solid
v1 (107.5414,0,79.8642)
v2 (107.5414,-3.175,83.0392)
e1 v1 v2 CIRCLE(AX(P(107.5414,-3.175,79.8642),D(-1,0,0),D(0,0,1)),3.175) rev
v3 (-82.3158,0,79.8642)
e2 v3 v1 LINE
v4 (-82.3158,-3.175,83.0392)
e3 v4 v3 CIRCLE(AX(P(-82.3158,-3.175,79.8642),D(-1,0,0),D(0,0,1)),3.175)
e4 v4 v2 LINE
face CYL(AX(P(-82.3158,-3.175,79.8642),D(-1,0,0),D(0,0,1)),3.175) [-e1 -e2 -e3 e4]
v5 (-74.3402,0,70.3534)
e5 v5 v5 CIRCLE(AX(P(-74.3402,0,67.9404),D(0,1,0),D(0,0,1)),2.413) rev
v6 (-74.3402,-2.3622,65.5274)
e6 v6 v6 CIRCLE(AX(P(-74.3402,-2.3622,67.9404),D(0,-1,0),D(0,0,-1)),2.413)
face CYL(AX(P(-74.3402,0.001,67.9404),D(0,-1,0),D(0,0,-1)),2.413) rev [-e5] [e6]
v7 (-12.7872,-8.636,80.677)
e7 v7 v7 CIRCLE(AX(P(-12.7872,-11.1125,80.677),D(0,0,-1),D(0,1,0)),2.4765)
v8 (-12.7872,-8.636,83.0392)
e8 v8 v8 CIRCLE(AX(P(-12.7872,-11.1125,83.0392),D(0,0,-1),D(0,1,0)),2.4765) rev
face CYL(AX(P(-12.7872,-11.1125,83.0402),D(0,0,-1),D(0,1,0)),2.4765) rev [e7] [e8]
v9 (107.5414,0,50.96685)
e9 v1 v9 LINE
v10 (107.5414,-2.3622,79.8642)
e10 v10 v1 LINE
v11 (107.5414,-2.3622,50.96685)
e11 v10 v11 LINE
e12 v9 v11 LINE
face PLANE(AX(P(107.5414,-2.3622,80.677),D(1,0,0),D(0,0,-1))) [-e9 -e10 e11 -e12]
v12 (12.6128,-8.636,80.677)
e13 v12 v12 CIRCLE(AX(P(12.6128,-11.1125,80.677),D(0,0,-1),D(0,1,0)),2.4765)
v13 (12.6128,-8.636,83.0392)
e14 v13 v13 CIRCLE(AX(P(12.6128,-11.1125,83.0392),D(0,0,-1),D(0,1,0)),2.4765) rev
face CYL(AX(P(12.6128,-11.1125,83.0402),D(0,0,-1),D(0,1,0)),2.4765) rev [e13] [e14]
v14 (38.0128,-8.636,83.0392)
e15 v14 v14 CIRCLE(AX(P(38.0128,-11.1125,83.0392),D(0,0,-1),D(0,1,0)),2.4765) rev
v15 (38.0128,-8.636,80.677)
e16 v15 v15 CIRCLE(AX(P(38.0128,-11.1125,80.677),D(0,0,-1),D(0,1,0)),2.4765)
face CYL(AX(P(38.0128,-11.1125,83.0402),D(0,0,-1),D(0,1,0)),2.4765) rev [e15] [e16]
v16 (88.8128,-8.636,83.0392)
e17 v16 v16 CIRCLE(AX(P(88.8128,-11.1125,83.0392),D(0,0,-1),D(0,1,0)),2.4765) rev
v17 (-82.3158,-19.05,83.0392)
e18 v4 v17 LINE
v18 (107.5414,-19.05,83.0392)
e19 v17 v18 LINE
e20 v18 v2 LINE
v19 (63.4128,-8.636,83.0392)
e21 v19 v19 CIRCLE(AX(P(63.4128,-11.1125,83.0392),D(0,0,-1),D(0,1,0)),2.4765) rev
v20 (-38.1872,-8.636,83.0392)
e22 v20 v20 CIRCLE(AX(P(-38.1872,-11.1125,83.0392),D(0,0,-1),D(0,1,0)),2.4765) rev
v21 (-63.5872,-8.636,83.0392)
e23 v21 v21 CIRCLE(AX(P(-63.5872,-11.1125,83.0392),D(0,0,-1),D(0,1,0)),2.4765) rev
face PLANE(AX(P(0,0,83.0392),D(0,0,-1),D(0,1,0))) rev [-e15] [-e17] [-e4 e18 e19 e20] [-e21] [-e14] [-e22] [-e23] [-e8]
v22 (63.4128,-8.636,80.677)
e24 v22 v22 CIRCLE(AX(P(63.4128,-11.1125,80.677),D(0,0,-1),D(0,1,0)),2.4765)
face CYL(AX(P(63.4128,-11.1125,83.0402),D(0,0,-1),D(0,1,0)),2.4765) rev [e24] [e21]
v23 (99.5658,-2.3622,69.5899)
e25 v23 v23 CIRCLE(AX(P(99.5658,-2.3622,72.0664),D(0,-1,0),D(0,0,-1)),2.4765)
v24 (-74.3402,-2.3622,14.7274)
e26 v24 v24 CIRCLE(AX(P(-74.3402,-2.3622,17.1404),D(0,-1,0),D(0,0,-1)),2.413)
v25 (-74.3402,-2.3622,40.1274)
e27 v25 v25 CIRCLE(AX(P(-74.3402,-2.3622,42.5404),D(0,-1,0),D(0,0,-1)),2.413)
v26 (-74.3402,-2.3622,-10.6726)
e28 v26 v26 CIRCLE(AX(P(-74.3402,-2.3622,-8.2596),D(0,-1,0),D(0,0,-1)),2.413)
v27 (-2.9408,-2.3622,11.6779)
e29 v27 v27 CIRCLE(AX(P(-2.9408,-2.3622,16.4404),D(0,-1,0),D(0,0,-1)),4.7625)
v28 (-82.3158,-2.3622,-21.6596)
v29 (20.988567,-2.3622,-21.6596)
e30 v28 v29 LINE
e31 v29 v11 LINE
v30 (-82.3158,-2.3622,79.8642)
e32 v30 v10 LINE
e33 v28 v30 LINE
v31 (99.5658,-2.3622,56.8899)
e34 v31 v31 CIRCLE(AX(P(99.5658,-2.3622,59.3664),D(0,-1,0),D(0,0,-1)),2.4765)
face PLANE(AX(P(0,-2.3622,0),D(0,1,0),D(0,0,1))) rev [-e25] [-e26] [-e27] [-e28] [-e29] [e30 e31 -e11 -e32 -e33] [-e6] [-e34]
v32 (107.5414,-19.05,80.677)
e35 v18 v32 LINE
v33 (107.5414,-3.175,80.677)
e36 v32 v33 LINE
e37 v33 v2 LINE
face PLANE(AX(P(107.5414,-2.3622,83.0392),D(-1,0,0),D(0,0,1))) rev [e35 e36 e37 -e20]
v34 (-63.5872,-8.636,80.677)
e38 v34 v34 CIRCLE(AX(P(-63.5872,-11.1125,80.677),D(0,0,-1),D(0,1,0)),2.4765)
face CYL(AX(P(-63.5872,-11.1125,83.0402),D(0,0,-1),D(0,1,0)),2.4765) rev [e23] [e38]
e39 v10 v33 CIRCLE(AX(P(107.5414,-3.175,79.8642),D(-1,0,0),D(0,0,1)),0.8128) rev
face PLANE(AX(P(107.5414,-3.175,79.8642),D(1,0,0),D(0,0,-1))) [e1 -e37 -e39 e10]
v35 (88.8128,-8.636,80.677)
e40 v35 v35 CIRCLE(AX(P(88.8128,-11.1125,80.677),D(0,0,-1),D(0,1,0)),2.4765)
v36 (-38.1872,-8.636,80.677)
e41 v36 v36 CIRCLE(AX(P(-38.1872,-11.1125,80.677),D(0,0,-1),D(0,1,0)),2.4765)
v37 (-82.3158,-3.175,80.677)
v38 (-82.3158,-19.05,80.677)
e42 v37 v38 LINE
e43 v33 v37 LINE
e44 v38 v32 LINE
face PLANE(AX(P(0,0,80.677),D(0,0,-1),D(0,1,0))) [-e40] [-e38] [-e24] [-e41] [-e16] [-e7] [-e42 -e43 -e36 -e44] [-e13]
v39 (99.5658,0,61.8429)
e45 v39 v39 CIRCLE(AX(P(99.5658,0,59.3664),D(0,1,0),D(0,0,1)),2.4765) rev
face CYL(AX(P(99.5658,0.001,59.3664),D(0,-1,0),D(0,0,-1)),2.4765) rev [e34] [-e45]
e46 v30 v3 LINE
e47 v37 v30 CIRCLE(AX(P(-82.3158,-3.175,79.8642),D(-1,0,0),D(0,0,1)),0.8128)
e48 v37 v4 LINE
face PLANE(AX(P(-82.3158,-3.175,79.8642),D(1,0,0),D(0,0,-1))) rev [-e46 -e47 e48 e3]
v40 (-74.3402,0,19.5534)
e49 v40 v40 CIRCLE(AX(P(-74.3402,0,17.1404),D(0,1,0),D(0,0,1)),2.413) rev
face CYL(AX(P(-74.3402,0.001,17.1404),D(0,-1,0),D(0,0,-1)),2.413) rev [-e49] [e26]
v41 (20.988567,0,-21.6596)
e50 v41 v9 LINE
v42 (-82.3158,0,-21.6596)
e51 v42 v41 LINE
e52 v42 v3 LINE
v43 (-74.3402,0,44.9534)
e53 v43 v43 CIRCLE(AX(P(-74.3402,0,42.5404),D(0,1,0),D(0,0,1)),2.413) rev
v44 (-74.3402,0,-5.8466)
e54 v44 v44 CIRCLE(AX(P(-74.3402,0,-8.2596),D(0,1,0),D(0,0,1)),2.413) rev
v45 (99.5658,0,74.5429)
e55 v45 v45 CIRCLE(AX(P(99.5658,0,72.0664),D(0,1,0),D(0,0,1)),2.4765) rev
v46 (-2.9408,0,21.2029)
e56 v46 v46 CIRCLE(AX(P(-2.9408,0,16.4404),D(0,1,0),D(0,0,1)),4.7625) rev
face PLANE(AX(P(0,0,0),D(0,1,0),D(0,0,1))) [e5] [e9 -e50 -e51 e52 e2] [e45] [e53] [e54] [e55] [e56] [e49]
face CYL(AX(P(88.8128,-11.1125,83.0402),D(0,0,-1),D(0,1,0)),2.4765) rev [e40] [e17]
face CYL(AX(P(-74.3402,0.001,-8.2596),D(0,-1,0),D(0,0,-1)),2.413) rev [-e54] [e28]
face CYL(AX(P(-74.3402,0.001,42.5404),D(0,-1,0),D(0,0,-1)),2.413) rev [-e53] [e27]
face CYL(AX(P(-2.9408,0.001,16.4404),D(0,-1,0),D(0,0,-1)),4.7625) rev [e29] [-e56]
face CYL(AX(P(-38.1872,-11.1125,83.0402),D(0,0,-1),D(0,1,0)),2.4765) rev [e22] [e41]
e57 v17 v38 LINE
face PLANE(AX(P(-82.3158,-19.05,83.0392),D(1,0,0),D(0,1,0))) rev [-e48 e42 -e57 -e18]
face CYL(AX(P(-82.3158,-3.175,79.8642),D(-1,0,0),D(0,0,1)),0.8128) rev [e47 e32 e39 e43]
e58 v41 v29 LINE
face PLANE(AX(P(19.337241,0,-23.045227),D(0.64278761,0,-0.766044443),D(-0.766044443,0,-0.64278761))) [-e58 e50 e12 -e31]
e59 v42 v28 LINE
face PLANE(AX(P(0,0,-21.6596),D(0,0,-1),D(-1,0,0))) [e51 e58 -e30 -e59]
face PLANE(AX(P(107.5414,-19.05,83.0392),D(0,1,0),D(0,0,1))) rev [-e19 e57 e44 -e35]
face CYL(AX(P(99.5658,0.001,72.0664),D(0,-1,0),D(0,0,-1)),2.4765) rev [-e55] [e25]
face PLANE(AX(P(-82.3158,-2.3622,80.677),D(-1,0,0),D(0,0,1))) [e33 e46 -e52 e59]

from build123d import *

# Parameters (mm, degrees)
SKETCH1_W                    = 189.8572
SKETCH1_H                    = 175.514
BASE_FLANGE1_DEPTH           = 2.3622
EDGE_FLANGE4_STRIP_W         = 11.0744
EDGE_FLANGE4_STRIP_H         = 2.3622
EDGE_FLANGE4_STRIP_CUT_DEPTH = 189.8572
EDGE_FLANGE4_DEPTH           = 189.8572
CUT_EXTRUDE1_DEPTH           = 145.352665205
CUT_EXTRUDE5_REACH           = 151.669
SKETCH41_R                   = 2.4765
CUT_EXTRUDE6_REACH           = 138.891
SKETCH42_R                   = 2.413
SKETCH42_R_2                 = 2.4765
CUT_EXTRUDE7_REACH           = 138.891
SKETCH43_R                   = 4.7625


# Sheet-metal steps are written as plain solids
with BuildPart() as part:
    # Sketch1 → Base-Flange1 (new body)
    with BuildSketch(Plane(origin=(0, 0, 0), x_dir=(1, 0, 0), z_dir=(0, 1, 0))):
        with Locations((12.6128, 7.08)):
            Rectangle(SKETCH1_W, SKETCH1_H)
    extrude(amount=-BASE_FLANGE1_DEPTH)

    # Edge-Flange4 strip (across the edge) → Edge-Flange4 strip cut (cut)
    with BuildSketch(Plane(origin=(107.5414, -2.3622, 80.677), x_dir=(0, 0, -1), z_dir=(-1, 0, 0))):
        with Locations((-4.7244, -1.1811)):
            Rectangle(EDGE_FLANGE4_STRIP_W, EDGE_FLANGE4_STRIP_H)
    extrude(amount=EDGE_FLANGE4_STRIP_CUT_DEPTH, mode=Mode.SUBTRACT)

    # Edge-Flange4 section (across the edge) → Edge-Flange4 (add)
    with BuildSketch(Plane(origin=(107.5414, -2.3622, 80.677), x_dir=(0, 0, -1), z_dir=(-1, 0, 0))):
        with BuildLine():
            Line((-2.3622, 0.8128), (-2.3622, 16.6878))
            Line((-2.3622, 16.6878), (0, 16.6878))
            Line((0, 16.6878), (0, 0.8128))
            ThreePointArc((0, 0.8128), (0.238063608, 0.238063608), (0.8128, 0))
            Line((0.8128, 0), (0.8128, -2.3622))
            ThreePointArc((0.8128, -2.3622), (-1.43226403, -1.43226403), (-2.3622, 0.8128))
        make_face()
    extrude(amount=EDGE_FLANGE4_DEPTH)

    # Sketch36 → Cut-Extrude1 (cut, through all)
    with BuildSketch(Plane.XZ.offset(2.3622)):
        Polygon((20.98856689, -21.6596), (-82.3158, -21.6596), (-82.3158, -94.837), (107.5414, -94.837), (107.5414, 50.96685034), align=None)
    extrude(amount=-CUT_EXTRUDE1_DEPTH, mode=Mode.SUBTRACT)

    # Sketch41 → Cut-Extrude5 (cut, up to next)
    with BuildSketch(Plane(origin=(0, 0, 80.677), x_dir=(-1, 0, 0), z_dir=(0, 0, -1)), mode=Mode.PRIVATE) as cut_extrude5_sk1:
        with Locations(Location((-88.8128, -11.1125, 0), (0, 0, 90))):
            Circle(SKETCH41_R)
    cut_extrude5_tool1 = extrude(cut_extrude5_sk1.sketch, amount=-CUT_EXTRUDE5_REACH, mode=Mode.PRIVATE) & part.part
    # Sketch41 → Cut-Extrude5 (cut, up to next)
    with BuildSketch(Plane(origin=(0, 0, 80.677), x_dir=(-1, 0, 0), z_dir=(0, 0, -1)), mode=Mode.PRIVATE) as cut_extrude5_sk2:
        with Locations(Location((-63.4128, -11.1125, 0), (0, 0, 90))):
            Circle(SKETCH41_R)
    cut_extrude5_tool2 = extrude(cut_extrude5_sk2.sketch, amount=-CUT_EXTRUDE5_REACH, mode=Mode.PRIVATE) & part.part
    # Sketch41 → Cut-Extrude5 (cut, up to next)
    with BuildSketch(Plane(origin=(0, 0, 80.677), x_dir=(-1, 0, 0), z_dir=(0, 0, -1)), mode=Mode.PRIVATE) as cut_extrude5_sk3:
        with Locations(Location((-38.0128, -11.1125, 0), (0, 0, 90))):
            Circle(SKETCH41_R)
    cut_extrude5_tool3 = extrude(cut_extrude5_sk3.sketch, amount=-CUT_EXTRUDE5_REACH, mode=Mode.PRIVATE) & part.part
    # Sketch41 → Cut-Extrude5 (cut, up to next)
    with BuildSketch(Plane(origin=(0, 0, 80.677), x_dir=(-1, 0, 0), z_dir=(0, 0, -1)), mode=Mode.PRIVATE) as cut_extrude5_sk4:
        with Locations(Location((-12.6128, -11.1125, 0), (0, 0, 90))):
            Circle(SKETCH41_R)
    cut_extrude5_tool4 = extrude(cut_extrude5_sk4.sketch, amount=-CUT_EXTRUDE5_REACH, mode=Mode.PRIVATE) & part.part
    # Sketch41 → Cut-Extrude5 (cut, up to next)
    with BuildSketch(Plane(origin=(0, 0, 80.677), x_dir=(-1, 0, 0), z_dir=(0, 0, -1)), mode=Mode.PRIVATE) as cut_extrude5_sk5:
        with Locations(Location((12.7872, -11.1125, 0), (0, 0, 90))):
            Circle(SKETCH41_R)
    cut_extrude5_tool5 = extrude(cut_extrude5_sk5.sketch, amount=-CUT_EXTRUDE5_REACH, mode=Mode.PRIVATE) & part.part
    # Sketch41 → Cut-Extrude5 (cut, up to next)
    with BuildSketch(Plane(origin=(0, 0, 80.677), x_dir=(-1, 0, 0), z_dir=(0, 0, -1)), mode=Mode.PRIVATE) as cut_extrude5_sk6:
        with Locations(Location((38.1872, -11.1125, 0), (0, 0, 90))):
            Circle(SKETCH41_R)
    cut_extrude5_tool6 = extrude(cut_extrude5_sk6.sketch, amount=-CUT_EXTRUDE5_REACH, mode=Mode.PRIVATE) & part.part
    # Sketch41 → Cut-Extrude5 (cut, up to next)
    with BuildSketch(Plane(origin=(0, 0, 80.677), x_dir=(-1, 0, 0), z_dir=(0, 0, -1)), mode=Mode.PRIVATE) as cut_extrude5_sk7:
        with Locations(Location((63.5872, -11.1125, 0), (0, 0, 90))):
            Circle(SKETCH41_R)
    cut_extrude5_tool7 = extrude(cut_extrude5_sk7.sketch, amount=-CUT_EXTRUDE5_REACH, mode=Mode.PRIVATE) & part.part
    add(cut_extrude5_tool1.solids().sort_by_distance((88.8128, -11.1125, 80.677))[0], mode=Mode.SUBTRACT)
    add(cut_extrude5_tool2.solids().sort_by_distance((63.4128, -11.1125, 80.677))[0], mode=Mode.SUBTRACT)
    add(cut_extrude5_tool3.solids().sort_by_distance((38.0128, -11.1125, 80.677))[0], mode=Mode.SUBTRACT)
    add(cut_extrude5_tool4.solids().sort_by_distance((12.6128, -11.1125, 80.677))[0], mode=Mode.SUBTRACT)
    add(cut_extrude5_tool5.solids().sort_by_distance((-12.7872, -11.1125, 80.677))[0], mode=Mode.SUBTRACT)
    add(cut_extrude5_tool6.solids().sort_by_distance((-38.1872, -11.1125, 80.677))[0], mode=Mode.SUBTRACT)
    add(cut_extrude5_tool7.solids().sort_by_distance((-63.5872, -11.1125, 80.677))[0], mode=Mode.SUBTRACT)

    # Sketch42 → Cut-Extrude6 (cut, up to next)
    with BuildSketch(Plane.XZ.offset(2.3622), mode=Mode.PRIVATE) as cut_extrude6_sk1:
        with Locations(Location((-74.3402, -8.2596, 0), (0, 0, 270))):
            Circle(SKETCH42_R)
    cut_extrude6_tool1 = extrude(cut_extrude6_sk1.sketch, amount=-CUT_EXTRUDE6_REACH, mode=Mode.PRIVATE) & part.part
    # Sketch42 → Cut-Extrude6 (cut, up to next)
    with BuildSketch(Plane.XZ.offset(2.3622), mode=Mode.PRIVATE) as cut_extrude6_sk2:
        with Locations(Location((-74.3402, 17.1404, 0), (0, 0, 270))):
            Circle(SKETCH42_R)
    cut_extrude6_tool2 = extrude(cut_extrude6_sk2.sketch, amount=-CUT_EXTRUDE6_REACH, mode=Mode.PRIVATE) & part.part
    # Sketch42 → Cut-Extrude6 (cut, up to next)
    with BuildSketch(Plane.XZ.offset(2.3622), mode=Mode.PRIVATE) as cut_extrude6_sk3:
        with Locations(Location((-74.3402, 42.5404, 0), (0, 0, 270))):
            Circle(SKETCH42_R)
    cut_extrude6_tool3 = extrude(cut_extrude6_sk3.sketch, amount=-CUT_EXTRUDE6_REACH, mode=Mode.PRIVATE) & part.part
    # Sketch42 → Cut-Extrude6 (cut, up to next)
    with BuildSketch(Plane.XZ.offset(2.3622), mode=Mode.PRIVATE) as cut_extrude6_sk4:
        with Locations(Location((-74.3402, 67.9404, 0), (0, 0, 270))):
            Circle(SKETCH42_R)
    cut_extrude6_tool4 = extrude(cut_extrude6_sk4.sketch, amount=-CUT_EXTRUDE6_REACH, mode=Mode.PRIVATE) & part.part
    # Sketch42 → Cut-Extrude6 (cut, up to next)
    with BuildSketch(Plane.XZ.offset(2.3622), mode=Mode.PRIVATE) as cut_extrude6_sk5:
        with Locations(Location((99.5658, 59.3664, 0), (0, 0, 270))):
            Circle(SKETCH42_R_2)
    cut_extrude6_tool5 = extrude(cut_extrude6_sk5.sketch, amount=-CUT_EXTRUDE6_REACH, mode=Mode.PRIVATE) & part.part
    # Sketch42 → Cut-Extrude6 (cut, up to next)
    with BuildSketch(Plane.XZ.offset(2.3622), mode=Mode.PRIVATE) as cut_extrude6_sk6:
        with Locations(Location((99.5658, 72.0664, 0), (0, 0, 270))):
            Circle(SKETCH42_R_2)
    cut_extrude6_tool6 = extrude(cut_extrude6_sk6.sketch, amount=-CUT_EXTRUDE6_REACH, mode=Mode.PRIVATE) & part.part
    add(cut_extrude6_tool1.solids().sort_by_distance((-74.3402, -2.3622, -8.2596))[0], mode=Mode.SUBTRACT)
    add(cut_extrude6_tool2.solids().sort_by_distance((-74.3402, -2.3622, 17.1404))[0], mode=Mode.SUBTRACT)
    add(cut_extrude6_tool3.solids().sort_by_distance((-74.3402, -2.3622, 42.5404))[0], mode=Mode.SUBTRACT)
    add(cut_extrude6_tool4.solids().sort_by_distance((-74.3402, -2.3622, 67.9404))[0], mode=Mode.SUBTRACT)
    add(cut_extrude6_tool5.solids().sort_by_distance((99.5658, -2.3622, 59.3664))[0], mode=Mode.SUBTRACT)
    add(cut_extrude6_tool6.solids().sort_by_distance((99.5658, -2.3622, 72.0664))[0], mode=Mode.SUBTRACT)

    # Sketch43 → Cut-Extrude7 (cut, up to next)
    with BuildSketch(Plane.XZ.offset(2.3622), mode=Mode.PRIVATE) as cut_extrude7_sk1:
        with Locations(Location((-2.9408, 16.4404, 0), (0, 0, 270))):
            Circle(SKETCH43_R)
    cut_extrude7_tool1 = extrude(cut_extrude7_sk1.sketch, amount=-CUT_EXTRUDE7_REACH, mode=Mode.PRIVATE) & part.part
    add(cut_extrude7_tool1.solids().sort_by_distance((-2.9408, -2.3622, 16.4404))[0], mode=Mode.SUBTRACT)


solid = part.part
